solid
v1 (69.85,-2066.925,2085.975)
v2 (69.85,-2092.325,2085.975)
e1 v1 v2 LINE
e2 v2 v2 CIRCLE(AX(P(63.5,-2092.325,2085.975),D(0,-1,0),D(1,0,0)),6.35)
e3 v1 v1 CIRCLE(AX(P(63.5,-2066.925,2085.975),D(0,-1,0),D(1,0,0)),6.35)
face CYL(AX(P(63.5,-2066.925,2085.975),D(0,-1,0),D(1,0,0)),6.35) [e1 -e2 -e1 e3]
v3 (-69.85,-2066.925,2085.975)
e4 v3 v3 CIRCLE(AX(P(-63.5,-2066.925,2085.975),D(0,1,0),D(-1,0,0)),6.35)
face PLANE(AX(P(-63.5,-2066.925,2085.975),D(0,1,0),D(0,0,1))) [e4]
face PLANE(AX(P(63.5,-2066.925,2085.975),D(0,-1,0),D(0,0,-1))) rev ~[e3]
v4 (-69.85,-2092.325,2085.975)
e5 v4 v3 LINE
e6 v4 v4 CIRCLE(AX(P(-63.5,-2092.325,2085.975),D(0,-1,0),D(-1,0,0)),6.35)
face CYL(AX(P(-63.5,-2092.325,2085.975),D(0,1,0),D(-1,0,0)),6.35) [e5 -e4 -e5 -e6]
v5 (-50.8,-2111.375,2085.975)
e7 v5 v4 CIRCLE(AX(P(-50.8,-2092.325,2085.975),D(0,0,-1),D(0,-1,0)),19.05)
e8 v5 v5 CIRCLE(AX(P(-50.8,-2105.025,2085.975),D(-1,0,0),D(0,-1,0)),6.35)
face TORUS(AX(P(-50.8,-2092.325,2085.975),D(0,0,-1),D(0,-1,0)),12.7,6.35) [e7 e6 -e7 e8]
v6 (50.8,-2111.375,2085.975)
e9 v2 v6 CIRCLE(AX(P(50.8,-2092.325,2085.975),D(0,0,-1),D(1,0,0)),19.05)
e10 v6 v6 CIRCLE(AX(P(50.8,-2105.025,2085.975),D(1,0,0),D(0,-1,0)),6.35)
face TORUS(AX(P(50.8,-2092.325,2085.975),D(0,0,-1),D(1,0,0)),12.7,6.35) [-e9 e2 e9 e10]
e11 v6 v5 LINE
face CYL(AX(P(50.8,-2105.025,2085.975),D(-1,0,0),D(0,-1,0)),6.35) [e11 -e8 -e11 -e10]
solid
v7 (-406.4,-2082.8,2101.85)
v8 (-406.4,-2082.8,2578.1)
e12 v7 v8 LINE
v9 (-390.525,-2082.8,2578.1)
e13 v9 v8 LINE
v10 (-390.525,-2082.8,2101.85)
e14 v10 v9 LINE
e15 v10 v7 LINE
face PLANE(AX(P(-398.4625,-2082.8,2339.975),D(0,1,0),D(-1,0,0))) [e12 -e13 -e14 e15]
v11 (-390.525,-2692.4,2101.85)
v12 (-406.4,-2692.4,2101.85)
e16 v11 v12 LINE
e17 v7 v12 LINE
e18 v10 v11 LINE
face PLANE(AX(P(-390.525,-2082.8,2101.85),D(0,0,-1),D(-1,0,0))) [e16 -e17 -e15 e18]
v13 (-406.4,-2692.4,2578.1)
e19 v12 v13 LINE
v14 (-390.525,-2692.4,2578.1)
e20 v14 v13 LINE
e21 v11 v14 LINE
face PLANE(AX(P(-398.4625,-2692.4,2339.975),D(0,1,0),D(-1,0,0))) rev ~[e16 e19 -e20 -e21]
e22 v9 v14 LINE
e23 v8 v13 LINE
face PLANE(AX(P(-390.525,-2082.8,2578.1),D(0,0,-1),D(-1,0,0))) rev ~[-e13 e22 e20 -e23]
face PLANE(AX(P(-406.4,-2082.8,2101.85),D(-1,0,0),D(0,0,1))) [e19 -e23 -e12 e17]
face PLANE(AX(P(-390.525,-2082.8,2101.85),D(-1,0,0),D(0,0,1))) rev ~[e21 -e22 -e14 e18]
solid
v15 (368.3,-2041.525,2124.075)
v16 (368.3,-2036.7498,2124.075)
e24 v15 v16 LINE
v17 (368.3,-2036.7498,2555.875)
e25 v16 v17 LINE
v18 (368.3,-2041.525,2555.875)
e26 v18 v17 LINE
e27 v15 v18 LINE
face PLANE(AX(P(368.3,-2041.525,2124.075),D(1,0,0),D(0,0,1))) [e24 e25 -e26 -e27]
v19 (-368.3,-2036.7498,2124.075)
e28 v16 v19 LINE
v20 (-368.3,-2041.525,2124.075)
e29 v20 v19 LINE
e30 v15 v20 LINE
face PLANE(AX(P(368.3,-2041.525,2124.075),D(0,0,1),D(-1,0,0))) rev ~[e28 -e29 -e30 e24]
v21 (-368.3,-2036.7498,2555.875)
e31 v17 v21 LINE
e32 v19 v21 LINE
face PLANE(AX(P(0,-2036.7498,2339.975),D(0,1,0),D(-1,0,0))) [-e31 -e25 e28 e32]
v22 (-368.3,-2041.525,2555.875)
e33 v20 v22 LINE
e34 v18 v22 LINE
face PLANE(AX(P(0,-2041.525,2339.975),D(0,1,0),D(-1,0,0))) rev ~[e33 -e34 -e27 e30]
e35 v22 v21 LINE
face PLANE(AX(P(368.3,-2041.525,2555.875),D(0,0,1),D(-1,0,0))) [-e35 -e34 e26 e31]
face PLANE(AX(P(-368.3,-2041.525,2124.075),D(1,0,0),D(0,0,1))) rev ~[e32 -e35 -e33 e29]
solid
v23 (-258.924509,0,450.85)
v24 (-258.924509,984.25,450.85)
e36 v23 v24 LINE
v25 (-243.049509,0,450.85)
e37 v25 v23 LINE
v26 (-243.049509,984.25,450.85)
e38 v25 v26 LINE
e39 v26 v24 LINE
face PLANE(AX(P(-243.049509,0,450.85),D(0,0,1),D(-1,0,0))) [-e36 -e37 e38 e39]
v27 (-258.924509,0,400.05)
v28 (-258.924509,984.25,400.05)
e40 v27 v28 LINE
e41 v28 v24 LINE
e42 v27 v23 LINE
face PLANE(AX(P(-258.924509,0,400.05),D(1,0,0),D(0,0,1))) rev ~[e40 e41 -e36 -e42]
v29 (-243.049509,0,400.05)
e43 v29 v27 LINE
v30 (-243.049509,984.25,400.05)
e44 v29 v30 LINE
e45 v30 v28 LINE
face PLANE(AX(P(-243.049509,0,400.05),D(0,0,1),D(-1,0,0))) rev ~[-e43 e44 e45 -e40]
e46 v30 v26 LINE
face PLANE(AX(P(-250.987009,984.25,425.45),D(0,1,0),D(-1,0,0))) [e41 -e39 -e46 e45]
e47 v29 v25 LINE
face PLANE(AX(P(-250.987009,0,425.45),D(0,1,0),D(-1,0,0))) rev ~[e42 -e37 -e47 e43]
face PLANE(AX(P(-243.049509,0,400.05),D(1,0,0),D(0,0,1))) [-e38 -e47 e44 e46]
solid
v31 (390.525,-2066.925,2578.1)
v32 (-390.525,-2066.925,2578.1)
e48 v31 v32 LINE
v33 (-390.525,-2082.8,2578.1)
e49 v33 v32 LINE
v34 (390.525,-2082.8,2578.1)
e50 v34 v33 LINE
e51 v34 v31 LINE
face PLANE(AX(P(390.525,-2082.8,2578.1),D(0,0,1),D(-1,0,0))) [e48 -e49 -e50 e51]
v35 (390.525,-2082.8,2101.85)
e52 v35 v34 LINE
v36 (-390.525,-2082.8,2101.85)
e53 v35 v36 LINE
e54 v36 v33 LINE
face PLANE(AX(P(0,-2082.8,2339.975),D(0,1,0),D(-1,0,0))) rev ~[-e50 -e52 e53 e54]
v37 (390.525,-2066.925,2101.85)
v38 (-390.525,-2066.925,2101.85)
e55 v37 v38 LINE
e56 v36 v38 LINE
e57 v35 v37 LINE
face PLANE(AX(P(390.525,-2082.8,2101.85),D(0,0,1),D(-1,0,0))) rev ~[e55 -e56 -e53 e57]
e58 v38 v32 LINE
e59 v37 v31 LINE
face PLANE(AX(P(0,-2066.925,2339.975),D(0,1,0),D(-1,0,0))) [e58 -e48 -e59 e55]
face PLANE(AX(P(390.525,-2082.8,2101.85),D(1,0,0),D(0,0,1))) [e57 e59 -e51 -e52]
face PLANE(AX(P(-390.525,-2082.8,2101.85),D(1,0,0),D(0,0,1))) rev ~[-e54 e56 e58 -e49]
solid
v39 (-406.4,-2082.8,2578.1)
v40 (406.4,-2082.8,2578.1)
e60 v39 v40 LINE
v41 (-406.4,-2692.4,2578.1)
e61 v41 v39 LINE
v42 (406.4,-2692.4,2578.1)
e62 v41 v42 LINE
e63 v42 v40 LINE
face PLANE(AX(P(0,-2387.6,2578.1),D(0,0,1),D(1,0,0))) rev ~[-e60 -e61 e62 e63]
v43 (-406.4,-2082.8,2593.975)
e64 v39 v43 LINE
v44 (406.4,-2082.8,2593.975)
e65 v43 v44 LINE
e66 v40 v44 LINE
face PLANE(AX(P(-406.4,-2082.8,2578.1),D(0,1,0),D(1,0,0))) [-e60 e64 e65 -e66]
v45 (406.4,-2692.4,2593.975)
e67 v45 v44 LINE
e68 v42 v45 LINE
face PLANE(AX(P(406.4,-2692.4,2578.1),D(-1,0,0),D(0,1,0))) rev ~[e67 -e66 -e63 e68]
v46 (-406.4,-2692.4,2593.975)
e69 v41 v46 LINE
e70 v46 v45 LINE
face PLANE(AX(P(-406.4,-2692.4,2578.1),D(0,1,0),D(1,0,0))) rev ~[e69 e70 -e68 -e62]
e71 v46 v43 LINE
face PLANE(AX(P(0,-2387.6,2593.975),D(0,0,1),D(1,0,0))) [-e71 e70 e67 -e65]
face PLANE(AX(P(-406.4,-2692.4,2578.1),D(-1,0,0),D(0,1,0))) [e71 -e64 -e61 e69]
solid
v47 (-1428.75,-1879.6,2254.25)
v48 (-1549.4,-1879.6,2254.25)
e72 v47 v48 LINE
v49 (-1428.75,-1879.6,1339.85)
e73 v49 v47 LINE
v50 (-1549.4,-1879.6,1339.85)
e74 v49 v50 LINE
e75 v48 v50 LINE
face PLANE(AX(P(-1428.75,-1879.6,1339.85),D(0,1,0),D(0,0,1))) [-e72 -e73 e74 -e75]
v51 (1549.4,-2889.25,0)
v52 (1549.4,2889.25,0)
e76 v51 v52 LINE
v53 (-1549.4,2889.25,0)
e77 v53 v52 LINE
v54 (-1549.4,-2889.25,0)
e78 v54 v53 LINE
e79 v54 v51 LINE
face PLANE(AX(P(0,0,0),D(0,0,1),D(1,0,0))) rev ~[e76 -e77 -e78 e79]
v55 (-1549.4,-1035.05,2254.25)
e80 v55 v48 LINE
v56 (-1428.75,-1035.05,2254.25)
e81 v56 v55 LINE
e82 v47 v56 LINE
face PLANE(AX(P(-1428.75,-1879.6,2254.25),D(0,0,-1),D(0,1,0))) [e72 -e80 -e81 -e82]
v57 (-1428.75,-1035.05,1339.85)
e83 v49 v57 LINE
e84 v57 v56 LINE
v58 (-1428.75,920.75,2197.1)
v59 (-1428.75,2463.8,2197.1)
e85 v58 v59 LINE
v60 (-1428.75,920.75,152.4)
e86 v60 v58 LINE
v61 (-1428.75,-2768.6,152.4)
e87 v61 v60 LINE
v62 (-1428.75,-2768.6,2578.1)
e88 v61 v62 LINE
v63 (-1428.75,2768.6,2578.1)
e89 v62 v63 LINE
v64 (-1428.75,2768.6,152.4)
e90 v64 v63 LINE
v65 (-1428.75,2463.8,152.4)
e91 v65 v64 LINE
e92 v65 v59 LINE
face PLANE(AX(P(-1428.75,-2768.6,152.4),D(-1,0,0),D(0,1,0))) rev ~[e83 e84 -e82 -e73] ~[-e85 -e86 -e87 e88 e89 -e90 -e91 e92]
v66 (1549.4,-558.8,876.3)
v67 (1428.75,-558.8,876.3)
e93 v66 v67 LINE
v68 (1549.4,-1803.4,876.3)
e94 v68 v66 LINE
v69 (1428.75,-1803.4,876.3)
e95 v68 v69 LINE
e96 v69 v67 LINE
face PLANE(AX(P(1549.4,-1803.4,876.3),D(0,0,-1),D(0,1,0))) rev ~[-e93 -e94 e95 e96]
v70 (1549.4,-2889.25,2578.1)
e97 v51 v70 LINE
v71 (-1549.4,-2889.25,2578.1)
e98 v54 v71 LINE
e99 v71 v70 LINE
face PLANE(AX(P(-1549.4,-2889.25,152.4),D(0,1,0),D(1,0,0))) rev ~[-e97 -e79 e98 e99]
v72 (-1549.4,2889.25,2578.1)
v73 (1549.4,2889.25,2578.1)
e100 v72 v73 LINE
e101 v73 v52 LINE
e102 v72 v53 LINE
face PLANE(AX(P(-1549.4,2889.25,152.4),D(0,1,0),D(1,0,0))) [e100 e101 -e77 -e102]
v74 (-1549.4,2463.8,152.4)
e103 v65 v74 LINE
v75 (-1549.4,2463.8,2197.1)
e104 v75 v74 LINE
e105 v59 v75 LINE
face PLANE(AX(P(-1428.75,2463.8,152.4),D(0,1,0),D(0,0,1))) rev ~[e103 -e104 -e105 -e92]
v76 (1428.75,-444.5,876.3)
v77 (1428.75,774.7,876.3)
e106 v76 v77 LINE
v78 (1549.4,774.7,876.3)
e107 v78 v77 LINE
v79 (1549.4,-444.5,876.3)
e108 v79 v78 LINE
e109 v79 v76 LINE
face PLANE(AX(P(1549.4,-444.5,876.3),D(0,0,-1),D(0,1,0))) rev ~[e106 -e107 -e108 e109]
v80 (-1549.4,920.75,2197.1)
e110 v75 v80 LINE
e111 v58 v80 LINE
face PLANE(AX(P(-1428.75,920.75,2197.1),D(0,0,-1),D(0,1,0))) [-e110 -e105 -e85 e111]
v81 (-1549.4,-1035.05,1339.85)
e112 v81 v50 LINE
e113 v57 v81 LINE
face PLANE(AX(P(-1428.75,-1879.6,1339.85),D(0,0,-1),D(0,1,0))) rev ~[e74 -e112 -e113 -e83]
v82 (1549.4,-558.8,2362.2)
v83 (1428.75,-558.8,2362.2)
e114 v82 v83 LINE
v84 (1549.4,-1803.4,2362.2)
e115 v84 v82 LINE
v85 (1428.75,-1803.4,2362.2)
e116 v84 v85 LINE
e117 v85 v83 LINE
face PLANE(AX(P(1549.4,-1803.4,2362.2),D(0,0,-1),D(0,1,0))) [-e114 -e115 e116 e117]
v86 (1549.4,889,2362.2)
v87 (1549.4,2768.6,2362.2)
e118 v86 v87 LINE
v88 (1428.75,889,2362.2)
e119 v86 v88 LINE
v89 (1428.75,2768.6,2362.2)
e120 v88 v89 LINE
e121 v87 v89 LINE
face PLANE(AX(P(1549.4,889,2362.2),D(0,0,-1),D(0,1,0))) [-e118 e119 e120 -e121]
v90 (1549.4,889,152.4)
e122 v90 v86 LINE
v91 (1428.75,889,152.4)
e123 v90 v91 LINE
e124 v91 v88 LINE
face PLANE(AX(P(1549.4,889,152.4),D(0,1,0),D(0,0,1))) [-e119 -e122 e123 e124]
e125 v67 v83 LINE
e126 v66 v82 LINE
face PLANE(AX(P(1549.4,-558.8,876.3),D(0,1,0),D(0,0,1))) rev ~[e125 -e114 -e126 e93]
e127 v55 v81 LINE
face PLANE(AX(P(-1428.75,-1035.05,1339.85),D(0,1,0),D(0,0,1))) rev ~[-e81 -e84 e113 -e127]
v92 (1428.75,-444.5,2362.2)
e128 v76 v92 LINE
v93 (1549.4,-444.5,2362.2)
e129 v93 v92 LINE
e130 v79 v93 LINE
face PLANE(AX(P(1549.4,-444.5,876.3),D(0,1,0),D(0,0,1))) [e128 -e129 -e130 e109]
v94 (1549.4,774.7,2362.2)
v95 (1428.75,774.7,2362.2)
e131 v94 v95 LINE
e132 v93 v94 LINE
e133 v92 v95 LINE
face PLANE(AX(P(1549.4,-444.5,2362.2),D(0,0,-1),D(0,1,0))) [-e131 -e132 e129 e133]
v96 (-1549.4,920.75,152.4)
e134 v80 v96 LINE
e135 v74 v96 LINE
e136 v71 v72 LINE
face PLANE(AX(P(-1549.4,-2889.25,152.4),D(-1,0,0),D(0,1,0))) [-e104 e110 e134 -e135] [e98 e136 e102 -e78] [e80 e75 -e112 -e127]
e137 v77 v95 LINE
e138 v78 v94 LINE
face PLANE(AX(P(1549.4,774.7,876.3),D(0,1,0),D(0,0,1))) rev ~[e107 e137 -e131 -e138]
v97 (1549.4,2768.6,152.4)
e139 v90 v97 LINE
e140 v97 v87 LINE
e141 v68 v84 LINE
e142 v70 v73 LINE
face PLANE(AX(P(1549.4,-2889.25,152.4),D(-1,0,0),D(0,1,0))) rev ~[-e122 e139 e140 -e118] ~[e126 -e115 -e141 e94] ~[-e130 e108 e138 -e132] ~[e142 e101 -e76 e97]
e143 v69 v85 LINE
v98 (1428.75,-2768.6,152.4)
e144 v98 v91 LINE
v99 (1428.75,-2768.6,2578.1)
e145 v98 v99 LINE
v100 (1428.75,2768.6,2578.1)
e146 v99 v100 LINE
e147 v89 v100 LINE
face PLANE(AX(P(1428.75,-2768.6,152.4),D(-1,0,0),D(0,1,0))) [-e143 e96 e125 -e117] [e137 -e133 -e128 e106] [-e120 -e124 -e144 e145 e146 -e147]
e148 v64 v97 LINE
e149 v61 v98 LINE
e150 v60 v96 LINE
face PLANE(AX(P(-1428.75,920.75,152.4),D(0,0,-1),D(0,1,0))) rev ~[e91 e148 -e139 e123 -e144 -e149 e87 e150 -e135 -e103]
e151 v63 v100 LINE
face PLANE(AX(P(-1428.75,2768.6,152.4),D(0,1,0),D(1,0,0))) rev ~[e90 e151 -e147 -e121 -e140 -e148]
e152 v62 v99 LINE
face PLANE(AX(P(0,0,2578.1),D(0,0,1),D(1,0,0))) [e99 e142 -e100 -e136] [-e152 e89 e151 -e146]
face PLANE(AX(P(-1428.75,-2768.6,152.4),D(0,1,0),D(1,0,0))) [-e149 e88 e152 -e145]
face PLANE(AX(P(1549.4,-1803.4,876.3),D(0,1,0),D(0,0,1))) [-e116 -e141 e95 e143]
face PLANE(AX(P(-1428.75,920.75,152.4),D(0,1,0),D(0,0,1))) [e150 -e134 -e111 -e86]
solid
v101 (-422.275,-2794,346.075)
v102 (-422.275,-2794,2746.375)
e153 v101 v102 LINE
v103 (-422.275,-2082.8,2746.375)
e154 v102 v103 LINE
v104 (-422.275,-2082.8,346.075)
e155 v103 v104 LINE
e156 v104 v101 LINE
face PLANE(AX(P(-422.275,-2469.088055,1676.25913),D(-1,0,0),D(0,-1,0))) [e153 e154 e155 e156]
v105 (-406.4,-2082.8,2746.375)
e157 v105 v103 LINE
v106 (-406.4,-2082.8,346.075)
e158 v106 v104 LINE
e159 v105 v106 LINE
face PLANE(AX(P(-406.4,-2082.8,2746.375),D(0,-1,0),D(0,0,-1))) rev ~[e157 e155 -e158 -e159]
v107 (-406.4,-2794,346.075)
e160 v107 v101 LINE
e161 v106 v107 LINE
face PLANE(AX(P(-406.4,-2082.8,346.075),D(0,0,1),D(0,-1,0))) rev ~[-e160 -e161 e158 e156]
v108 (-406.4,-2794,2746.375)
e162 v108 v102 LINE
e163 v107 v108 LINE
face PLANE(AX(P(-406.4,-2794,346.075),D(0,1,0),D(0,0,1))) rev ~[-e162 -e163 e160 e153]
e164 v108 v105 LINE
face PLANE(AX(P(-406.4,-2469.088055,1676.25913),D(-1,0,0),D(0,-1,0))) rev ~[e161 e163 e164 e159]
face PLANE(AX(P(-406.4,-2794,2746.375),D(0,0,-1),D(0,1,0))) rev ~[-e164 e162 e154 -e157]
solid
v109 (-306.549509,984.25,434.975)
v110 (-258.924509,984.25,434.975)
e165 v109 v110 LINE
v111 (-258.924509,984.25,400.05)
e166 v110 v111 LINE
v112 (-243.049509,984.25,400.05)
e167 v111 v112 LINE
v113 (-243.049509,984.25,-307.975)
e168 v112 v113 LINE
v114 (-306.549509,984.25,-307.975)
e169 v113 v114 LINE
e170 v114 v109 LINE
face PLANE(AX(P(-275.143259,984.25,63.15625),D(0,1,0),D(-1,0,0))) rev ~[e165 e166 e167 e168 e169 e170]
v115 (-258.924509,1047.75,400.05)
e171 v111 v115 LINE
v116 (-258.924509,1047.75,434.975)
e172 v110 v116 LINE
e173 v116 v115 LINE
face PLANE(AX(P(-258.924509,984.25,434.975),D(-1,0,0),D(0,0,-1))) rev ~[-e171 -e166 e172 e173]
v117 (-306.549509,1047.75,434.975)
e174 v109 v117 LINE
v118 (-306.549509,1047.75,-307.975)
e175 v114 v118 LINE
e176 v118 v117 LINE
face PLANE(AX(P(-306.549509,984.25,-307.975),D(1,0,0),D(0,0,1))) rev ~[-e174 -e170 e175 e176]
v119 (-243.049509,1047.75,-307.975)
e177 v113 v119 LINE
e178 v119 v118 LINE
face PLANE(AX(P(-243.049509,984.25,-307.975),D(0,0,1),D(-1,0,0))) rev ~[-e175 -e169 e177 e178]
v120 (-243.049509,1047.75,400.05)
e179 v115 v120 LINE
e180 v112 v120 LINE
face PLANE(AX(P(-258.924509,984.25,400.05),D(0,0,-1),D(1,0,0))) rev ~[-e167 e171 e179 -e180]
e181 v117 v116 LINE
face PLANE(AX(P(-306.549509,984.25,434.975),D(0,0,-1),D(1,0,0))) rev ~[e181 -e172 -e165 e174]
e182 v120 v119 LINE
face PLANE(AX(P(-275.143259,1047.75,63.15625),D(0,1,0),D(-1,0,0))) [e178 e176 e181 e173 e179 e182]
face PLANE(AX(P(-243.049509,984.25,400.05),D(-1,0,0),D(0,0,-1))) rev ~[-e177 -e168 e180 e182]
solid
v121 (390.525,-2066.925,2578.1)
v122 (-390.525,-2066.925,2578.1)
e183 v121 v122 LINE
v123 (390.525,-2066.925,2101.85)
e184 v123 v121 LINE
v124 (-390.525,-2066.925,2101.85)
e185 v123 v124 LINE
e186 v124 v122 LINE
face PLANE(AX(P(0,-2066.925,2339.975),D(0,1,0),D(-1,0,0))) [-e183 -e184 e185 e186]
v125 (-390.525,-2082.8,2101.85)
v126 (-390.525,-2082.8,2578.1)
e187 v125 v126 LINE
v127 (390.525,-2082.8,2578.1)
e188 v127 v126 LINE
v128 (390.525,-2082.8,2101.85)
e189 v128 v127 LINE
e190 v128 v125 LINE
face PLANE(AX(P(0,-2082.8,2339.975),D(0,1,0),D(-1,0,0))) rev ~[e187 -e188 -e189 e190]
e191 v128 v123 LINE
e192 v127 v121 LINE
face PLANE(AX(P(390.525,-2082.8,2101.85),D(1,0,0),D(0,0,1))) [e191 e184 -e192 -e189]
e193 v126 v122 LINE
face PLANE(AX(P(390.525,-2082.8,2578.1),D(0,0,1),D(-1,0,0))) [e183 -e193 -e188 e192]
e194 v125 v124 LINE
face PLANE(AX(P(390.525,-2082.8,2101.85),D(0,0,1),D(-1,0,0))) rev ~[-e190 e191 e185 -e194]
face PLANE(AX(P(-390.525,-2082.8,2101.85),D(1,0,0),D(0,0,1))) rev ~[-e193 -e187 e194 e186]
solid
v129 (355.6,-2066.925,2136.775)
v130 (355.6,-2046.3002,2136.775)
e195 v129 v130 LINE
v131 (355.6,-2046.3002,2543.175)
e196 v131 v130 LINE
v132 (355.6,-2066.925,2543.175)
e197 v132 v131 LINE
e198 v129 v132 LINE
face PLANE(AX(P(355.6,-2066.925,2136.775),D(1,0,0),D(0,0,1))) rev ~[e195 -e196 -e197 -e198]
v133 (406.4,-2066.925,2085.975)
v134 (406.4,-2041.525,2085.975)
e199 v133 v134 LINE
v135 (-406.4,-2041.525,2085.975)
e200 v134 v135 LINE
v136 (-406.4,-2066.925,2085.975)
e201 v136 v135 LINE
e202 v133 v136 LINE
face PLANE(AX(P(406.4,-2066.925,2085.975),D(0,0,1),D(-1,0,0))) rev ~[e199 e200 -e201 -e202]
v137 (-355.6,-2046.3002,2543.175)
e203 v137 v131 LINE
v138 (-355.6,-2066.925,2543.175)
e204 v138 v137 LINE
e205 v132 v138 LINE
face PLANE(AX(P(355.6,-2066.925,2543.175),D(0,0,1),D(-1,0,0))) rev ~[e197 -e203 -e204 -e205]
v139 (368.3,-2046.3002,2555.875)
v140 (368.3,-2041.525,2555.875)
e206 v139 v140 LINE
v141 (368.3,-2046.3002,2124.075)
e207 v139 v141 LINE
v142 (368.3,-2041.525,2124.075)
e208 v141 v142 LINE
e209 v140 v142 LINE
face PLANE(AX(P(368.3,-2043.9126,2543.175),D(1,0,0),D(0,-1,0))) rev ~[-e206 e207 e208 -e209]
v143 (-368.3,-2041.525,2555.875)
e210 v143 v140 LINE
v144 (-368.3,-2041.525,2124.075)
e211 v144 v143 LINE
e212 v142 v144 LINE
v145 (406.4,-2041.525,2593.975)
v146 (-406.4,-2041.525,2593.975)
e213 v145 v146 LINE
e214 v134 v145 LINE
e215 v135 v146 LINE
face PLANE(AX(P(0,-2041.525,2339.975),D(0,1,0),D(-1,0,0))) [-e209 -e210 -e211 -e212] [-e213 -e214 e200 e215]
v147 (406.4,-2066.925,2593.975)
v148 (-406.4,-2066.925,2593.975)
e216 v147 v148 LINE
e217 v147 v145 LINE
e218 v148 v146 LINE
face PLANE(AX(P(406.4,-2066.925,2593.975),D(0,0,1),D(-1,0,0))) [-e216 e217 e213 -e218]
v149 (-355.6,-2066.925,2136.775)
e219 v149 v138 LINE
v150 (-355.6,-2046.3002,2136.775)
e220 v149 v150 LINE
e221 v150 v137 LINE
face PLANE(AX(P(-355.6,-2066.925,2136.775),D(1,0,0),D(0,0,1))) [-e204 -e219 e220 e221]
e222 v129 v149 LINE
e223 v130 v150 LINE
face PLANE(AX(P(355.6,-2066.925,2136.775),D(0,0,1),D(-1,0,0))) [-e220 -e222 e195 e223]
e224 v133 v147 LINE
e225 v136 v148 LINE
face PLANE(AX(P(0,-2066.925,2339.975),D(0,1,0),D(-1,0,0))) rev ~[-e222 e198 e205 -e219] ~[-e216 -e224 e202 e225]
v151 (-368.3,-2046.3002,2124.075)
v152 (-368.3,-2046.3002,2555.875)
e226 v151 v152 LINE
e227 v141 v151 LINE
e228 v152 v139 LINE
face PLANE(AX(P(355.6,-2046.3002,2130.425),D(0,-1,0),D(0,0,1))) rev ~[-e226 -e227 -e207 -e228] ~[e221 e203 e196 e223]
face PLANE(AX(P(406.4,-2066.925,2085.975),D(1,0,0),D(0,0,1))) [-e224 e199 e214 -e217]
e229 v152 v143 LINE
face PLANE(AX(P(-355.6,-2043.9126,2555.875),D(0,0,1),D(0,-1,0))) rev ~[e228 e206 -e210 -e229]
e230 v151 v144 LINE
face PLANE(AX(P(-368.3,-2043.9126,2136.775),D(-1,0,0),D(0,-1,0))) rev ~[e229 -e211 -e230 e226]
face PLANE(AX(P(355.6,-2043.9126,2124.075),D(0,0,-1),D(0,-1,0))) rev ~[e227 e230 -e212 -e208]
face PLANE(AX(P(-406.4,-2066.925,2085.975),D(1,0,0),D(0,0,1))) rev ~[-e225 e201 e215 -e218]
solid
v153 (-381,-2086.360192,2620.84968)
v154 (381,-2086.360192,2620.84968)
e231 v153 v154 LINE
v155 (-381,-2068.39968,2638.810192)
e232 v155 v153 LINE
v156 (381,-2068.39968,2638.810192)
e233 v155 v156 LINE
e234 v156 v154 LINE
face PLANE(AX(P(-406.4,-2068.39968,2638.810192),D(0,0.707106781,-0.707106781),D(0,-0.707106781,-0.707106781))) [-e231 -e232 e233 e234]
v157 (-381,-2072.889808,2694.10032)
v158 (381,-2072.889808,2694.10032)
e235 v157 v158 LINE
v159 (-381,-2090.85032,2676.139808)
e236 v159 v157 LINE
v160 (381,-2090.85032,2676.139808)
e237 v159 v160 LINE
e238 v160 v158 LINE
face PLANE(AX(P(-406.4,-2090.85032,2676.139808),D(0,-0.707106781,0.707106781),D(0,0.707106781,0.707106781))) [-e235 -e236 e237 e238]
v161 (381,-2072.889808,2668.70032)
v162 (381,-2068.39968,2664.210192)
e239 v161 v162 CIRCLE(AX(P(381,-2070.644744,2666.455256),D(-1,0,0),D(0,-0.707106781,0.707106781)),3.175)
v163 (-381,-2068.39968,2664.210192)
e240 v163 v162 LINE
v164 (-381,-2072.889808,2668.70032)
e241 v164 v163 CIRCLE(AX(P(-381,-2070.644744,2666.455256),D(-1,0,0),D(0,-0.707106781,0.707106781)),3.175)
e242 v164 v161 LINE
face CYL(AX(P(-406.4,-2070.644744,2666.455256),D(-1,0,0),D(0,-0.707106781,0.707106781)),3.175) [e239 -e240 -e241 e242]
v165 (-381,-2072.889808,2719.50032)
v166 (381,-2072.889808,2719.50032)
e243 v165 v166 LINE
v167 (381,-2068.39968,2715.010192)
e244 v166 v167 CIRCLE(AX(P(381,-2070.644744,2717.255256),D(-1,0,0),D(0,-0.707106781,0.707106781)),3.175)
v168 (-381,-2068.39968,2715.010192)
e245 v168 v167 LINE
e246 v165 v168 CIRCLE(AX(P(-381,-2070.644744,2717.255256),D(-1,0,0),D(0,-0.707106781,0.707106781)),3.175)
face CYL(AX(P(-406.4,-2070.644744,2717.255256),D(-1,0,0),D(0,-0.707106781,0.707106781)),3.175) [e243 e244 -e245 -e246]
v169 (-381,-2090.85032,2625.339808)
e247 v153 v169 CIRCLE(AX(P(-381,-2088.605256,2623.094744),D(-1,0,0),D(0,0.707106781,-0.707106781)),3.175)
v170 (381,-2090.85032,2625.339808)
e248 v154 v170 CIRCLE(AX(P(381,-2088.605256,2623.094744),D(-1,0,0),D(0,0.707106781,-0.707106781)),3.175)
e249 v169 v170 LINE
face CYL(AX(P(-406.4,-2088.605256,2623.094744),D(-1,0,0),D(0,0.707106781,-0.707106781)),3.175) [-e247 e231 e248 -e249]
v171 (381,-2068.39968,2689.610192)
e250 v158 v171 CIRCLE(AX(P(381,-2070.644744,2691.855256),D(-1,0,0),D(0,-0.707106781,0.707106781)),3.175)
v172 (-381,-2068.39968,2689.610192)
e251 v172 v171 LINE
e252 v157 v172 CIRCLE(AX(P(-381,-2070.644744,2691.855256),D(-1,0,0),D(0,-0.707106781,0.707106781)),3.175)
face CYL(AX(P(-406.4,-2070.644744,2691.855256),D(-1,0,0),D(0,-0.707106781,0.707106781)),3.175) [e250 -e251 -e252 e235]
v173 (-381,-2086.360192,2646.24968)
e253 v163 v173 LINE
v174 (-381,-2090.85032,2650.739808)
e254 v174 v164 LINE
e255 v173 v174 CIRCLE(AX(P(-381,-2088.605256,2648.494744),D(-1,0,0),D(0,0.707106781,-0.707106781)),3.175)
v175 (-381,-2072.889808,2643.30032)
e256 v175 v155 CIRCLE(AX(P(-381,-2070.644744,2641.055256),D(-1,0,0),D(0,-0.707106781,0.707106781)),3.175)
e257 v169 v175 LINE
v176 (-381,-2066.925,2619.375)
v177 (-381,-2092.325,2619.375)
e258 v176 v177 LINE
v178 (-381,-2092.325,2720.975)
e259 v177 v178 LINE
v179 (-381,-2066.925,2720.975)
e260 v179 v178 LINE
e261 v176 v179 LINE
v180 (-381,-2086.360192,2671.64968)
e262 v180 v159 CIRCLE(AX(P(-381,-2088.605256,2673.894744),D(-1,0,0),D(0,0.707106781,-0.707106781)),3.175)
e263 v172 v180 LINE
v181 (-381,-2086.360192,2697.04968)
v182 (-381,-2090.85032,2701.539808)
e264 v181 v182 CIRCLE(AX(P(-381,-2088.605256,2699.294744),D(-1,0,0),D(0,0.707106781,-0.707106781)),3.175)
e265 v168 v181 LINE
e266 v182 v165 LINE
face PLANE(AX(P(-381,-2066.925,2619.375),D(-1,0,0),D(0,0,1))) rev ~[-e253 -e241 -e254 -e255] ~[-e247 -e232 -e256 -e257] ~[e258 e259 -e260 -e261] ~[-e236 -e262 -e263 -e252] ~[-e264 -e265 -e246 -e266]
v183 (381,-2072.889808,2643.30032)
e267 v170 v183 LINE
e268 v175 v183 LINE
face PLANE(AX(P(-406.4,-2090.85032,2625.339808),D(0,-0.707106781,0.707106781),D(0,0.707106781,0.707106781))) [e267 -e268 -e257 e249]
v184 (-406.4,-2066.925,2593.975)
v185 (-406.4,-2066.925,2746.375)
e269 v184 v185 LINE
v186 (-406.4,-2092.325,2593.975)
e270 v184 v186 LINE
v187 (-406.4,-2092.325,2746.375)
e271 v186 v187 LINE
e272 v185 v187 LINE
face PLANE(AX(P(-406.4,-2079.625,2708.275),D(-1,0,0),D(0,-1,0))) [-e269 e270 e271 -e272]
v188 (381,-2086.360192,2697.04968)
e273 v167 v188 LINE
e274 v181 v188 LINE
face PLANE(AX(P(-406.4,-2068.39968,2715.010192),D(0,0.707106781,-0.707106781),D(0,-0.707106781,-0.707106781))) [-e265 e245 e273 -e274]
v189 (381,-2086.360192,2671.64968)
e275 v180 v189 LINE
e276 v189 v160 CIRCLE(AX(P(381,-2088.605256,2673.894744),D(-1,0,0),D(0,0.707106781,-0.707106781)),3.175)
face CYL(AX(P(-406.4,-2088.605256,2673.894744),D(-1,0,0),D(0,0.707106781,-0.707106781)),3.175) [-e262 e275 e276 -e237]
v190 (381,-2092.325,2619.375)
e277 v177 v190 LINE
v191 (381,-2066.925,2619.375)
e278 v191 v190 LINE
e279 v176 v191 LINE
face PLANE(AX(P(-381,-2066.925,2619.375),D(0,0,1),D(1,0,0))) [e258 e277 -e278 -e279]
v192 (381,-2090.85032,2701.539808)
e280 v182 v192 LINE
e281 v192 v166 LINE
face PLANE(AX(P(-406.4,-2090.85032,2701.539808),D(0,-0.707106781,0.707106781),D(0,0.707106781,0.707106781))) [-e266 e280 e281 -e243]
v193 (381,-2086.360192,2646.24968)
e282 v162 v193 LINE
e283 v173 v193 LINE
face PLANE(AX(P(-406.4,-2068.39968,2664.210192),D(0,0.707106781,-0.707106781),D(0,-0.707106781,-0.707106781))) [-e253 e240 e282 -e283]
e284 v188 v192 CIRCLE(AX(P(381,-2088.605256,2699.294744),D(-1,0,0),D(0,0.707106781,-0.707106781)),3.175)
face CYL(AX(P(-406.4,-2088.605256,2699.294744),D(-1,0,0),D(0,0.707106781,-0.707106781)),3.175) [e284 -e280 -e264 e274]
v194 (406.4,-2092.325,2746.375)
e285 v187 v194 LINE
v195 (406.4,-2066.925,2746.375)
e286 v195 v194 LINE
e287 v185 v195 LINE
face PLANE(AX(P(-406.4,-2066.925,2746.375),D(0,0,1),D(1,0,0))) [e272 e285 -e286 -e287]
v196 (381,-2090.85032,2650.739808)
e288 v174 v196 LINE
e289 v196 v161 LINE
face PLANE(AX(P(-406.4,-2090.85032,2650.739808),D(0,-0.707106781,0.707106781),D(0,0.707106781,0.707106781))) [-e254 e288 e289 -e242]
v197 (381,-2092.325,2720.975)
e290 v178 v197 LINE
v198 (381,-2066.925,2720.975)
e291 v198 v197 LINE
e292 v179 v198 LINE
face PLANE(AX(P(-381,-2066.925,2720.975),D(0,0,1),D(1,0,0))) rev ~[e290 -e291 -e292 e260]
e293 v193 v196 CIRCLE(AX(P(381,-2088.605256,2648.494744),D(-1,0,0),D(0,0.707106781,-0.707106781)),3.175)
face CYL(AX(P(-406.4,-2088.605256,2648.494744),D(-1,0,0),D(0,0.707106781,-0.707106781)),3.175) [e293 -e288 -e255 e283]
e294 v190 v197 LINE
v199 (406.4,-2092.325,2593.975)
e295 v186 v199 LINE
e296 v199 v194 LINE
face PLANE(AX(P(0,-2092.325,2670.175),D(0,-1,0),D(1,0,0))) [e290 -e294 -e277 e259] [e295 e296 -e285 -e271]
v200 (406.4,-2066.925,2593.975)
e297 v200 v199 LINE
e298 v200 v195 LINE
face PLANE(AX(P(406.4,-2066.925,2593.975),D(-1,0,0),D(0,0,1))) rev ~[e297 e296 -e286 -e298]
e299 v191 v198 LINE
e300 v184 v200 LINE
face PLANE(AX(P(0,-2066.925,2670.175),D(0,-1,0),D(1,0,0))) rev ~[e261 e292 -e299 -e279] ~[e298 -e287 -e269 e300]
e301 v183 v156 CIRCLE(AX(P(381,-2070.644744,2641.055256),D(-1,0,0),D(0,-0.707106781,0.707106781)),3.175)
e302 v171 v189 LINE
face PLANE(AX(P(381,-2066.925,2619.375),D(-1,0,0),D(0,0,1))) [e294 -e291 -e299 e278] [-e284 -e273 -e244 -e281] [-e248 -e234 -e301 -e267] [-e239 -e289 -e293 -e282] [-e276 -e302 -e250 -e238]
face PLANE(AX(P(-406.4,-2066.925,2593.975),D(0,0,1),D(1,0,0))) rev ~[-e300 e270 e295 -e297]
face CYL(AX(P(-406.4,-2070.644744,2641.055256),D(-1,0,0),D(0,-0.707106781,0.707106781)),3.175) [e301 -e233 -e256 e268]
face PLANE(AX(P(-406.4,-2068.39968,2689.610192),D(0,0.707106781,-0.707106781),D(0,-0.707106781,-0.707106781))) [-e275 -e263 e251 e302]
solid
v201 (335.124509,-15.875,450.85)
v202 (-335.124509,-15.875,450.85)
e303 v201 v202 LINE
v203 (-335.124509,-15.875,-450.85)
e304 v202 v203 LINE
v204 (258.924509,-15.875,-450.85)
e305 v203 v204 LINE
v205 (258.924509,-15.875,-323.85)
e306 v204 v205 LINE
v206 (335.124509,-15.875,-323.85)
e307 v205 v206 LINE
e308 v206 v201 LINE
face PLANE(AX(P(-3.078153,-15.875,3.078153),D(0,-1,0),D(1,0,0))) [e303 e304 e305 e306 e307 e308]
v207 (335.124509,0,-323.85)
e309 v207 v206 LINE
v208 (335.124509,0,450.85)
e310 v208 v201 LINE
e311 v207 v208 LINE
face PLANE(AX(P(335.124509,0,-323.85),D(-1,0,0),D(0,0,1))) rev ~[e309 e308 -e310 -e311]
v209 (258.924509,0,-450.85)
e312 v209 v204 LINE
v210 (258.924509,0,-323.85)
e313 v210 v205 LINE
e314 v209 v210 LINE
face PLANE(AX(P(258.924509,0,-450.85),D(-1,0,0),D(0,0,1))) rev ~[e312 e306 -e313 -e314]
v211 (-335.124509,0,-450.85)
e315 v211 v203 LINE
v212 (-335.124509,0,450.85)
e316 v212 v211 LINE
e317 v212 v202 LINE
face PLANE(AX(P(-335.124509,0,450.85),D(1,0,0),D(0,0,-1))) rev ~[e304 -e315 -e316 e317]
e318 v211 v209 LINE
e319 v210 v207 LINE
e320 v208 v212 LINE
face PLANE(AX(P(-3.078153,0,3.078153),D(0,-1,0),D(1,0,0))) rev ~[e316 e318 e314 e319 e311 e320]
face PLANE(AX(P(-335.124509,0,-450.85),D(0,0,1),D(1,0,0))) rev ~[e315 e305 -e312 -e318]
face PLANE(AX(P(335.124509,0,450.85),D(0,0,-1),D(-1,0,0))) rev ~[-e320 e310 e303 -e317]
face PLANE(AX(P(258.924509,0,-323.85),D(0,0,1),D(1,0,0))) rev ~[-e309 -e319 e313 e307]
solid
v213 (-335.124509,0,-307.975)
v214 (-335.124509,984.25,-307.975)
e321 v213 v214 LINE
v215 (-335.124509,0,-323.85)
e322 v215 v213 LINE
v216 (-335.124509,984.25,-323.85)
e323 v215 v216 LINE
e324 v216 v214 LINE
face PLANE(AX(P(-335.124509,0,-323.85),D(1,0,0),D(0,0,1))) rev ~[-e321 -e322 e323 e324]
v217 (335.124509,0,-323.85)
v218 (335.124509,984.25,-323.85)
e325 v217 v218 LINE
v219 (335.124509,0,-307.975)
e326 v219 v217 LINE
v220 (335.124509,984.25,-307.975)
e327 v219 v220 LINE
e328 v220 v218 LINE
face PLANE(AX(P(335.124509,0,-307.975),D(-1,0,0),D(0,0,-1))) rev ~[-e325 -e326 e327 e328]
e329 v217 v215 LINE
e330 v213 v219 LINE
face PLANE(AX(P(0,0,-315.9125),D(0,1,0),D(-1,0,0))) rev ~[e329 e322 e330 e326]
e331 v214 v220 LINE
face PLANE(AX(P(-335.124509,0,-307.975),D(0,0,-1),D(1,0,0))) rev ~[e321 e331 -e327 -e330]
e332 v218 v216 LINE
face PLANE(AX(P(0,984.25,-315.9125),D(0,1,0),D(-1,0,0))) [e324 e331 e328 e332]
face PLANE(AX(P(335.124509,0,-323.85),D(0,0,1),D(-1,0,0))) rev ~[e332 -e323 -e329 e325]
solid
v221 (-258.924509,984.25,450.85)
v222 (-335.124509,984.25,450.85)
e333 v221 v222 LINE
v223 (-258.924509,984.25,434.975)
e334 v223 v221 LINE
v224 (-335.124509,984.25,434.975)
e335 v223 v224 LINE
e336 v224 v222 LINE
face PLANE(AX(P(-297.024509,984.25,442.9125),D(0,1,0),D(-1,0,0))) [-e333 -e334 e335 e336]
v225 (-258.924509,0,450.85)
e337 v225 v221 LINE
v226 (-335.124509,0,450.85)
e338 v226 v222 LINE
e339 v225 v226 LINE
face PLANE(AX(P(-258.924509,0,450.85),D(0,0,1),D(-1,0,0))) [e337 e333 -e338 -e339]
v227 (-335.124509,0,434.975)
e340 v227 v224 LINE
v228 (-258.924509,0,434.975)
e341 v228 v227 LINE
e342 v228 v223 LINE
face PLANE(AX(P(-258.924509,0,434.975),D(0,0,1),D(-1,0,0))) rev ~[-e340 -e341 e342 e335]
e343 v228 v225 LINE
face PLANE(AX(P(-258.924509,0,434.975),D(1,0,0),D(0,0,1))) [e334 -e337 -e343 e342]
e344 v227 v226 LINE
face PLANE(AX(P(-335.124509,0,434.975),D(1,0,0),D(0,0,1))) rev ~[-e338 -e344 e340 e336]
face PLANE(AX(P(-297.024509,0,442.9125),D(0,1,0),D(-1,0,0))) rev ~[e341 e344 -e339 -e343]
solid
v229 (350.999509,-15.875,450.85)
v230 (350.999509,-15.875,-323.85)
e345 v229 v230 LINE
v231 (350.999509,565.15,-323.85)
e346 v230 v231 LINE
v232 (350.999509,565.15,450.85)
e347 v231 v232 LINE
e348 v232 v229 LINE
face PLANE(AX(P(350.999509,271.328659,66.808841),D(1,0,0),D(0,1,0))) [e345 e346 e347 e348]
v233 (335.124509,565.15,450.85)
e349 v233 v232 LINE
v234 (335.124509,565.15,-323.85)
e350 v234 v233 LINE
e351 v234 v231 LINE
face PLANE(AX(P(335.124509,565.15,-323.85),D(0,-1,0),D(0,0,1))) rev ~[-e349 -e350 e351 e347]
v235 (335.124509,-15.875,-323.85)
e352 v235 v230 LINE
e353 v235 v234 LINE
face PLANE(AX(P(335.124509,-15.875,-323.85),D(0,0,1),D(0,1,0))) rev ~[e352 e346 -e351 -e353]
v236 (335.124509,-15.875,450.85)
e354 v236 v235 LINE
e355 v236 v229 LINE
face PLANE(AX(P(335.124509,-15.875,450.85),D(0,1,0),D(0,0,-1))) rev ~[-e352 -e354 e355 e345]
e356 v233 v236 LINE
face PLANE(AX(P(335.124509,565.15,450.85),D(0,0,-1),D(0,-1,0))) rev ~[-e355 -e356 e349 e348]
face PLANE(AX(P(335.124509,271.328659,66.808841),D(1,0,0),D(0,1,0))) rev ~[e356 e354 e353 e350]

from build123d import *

# Parameters (mm, degrees)
F0_W      = 3098.8
F0_H      = 5778.5
F1_DEPTH  = 152.4
F2_W      = 3098.8
F2_H      = 5778.5
F2_W_2    = 2857.5
F2_H_2    = 5537.2
F3_DEPTH  = 2425.7
F4_W      = 1879.6
F4_H      = 2209.8
F5_DEPTH  = 120.65
F6_W      = 1219.2
F6_H      = 1485.9
F6_W_2    = 1244.6
F7_DEPTH  = 120.65
F8_W      = 844.55
F8_H      = 914.4
F9_DEPTH  = 120.651
F10_W     = 1543.05
F10_H     = 2044.7
F11_DEPTH = 120.651
F13_W     = 812.8
F13_H     = 609.6
F14_DEPTH = 15.875
F15_W     = 781.05
F15_H     = 476.25
F16_DEPTH = 15.875
F15_W_2   = 15.875
F17_DEPTH = 609.6
F18_DEPTH = 15.875
F19_W     = 812.8
F19_H     = 508
F19_W_2   = 781.05
F19_H_2   = 476.25
F19_W_3   = 711.2
F19_H_3   = 406.4
F20_DEPTH = 25.4
F21_W     = 4.7752
F21_H     = 12.7
F24_W     = 736.6
F24_H     = 431.8
F25_DEPTH = 4.7752
F29_W     = 812.8
F29_H     = 152.4
F29_W_2   = 762
F29_H_2   = 101.6
F30_DEPTH = 25.4
F32_DEPTH = 787.4
F34_DEPTH = 15.875
F35_W     = 76.2
F35_H     = 15.875
F36_DEPTH = 984.25
F38_DEPTH = 984.25
F39_W     = 15.875
F39_H     = 50.8
F40_DEPTH = 984.25
F42_DEPTH = 63.5
F43_W     = 565.15
F43_H     = 15.875
F44_DEPTH = 15.875
F45_W     = 609.6
F45_H     = 476.25
F46_DEPTH = 15.875


with BuildPart() as f1:
    # F0 (on Top) → F1 (new body)
    with BuildSketch(Plane.XY):
        Rectangle(F0_W, F0_H)
    extrude(amount=F1_DEPTH)

    # F2 (on face) → F3 (join)
    with BuildSketch(Plane.XY.offset(152.4)):
        Rectangle(F2_W, F2_H)
        Rectangle(F2_W_2, F2_H_2, mode=Mode.SUBTRACT)
    extrude(amount=F3_DEPTH)

    # F4 (on face) → F5 (cut, through all)
    with BuildSketch(Plane.YZ.offset(1549.4)):
        with Locations((1828.8, 1257.3)):
            Rectangle(F4_W, F4_H)
    extrude(amount=-F5_DEPTH, mode=Mode.SUBTRACT)

    # F6 (on face) → F7 (cut, through all)
    with BuildSketch(Plane.YZ.offset(1549.4)):
        with Locations((165.1, 1619.25)):
            Rectangle(F6_W, F6_H)
        with Locations((-1181.1, 1619.25)):
            Rectangle(F6_W_2, F6_H)
    extrude(amount=-F7_DEPTH, mode=Mode.SUBTRACT)

    # F8 (on face) → F9 (cut, through all)
    with BuildSketch(Plane.YZ.offset(-1428.75)):
        with Locations((-1457.325, 1797.05)):
            Rectangle(F8_W, F8_H)
    extrude(amount=-F9_DEPTH, mode=Mode.SUBTRACT)

    # F10 (on face) → F11 (cut, through all)
    with BuildSketch(Plane.YZ.offset(-1428.75)):
        with Locations((1692.275, 1174.75)):
            Rectangle(F10_W, F10_H)
    extrude(amount=-F11_DEPTH, mode=Mode.SUBTRACT)


with BuildPart() as f14:
    # F13 (on face) → F14 (new body)
    with BuildSketch(Plane.XY.offset(2578.1)):
        with Locations((0, -2387.6)):
            Rectangle(F13_W, F13_H)
    extrude(amount=F14_DEPTH)


with BuildPart() as f16:
    # F15 (on face) → F16 (new body)
    with BuildSketch(Plane(origin=(0, -2082.8, 0), x_dir=(-1, 0, 0), z_dir=(0, 1, 0))):
        with Locations((0, 2339.975)):
            Rectangle(F15_W, F15_H)
    extrude(amount=F16_DEPTH)


with BuildPart() as f17:
    # F15 (on face) → F17 (new body, through all)
    with BuildSketch(Plane(origin=(0, -2082.8, 0), x_dir=(-1, 0, 0), z_dir=(0, 1, 0))):
        with Locations((398.4625, 2339.975)):
            Rectangle(F15_W_2, F15_H)
    extrude(amount=-F17_DEPTH)


with BuildPart() as f18:
    # F15 (on face) → F18 (new body)
    with BuildSketch(Plane(origin=(0, -2082.8, 0), x_dir=(-1, 0, 0), z_dir=(0, 1, 0))):
        with Locations((0, 2339.975)):
            Rectangle(F15_W, F15_H)
    extrude(amount=F18_DEPTH)


with BuildPart() as f20:
    # F19 (on face) → F20 (new body)
    with BuildSketch(Plane(origin=(0, -2066.925, 0), x_dir=(-1, 0, 0), z_dir=(0, 1, 0))):
        with Locations((0, 2339.975)):
            Rectangle(F19_W, F19_H)
        with Locations((0, 2339.975)):
            Rectangle(F19_W_2, F19_H_2, mode=Mode.SUBTRACT)
        with Locations((0, 2339.975)):
            Rectangle(F19_W_2, F19_H_2)
        with Locations((0, 2339.975)):
            Rectangle(F19_W_3, F19_H_3, mode=Mode.SUBTRACT)
    extrude(amount=F20_DEPTH)

    # F23: sweep along a path in F22
    with BuildLine(Plane(origin=(0, -2041.525, 0), x_dir=(-1, 0, 0), z_dir=(0, 1, 0))) as f23_path:
        Line((355.6, 2543.175), (-355.6, 2543.175))
        Line((-355.6, 2543.175), (-355.6, 2136.775))
        Line((-355.6, 2136.775), (355.6, 2136.775))
        Line((355.6, 2136.775), (355.6, 2543.175))
    # F21 (on face) → F23 (sweep, cut)
    with BuildSketch(Plane(origin=(355.6, 0, 0), x_dir=(0, -1, 0), z_dir=(-1, 0, 0))):
        with Locations((2043.9126, 2130.425)):
            Rectangle(F21_W, F21_H)
    sweep(path=f23_path.line, transition=Transition.RIGHT, mode=Mode.SUBTRACT)


with BuildPart() as f25:
    # F24 (on face) → F25 (new body)
    with BuildSketch(Plane(origin=(0, -2041.525, 0), x_dir=(-1, 0, 0), z_dir=(0, 1, 0))):
        with Locations((0, 2339.975)):
            Rectangle(F24_W, F24_H)
    extrude(amount=F25_DEPTH)


with BuildPart() as f28:
    # F28: sweep along a path in F26
    with BuildLine(Plane(origin=(0, 0, 2085.975), x_dir=(1, 0, 0), z_dir=(0, 0, -1))) as f28_path:
        Line((63.5, 2066.925), (63.5, 2092.325))
        ThreePointArc((63.5, 2092.325), (59.7802561211, 2101.3052561211), (50.8, 2105.025))
        Line((50.8, 2105.025), (-50.8, 2105.025))
        ThreePointArc((-50.8, 2105.025), (-59.7802561211, 2101.3052561211), (-63.5, 2092.325))
        Line((-63.5, 2092.325), (-63.5, 2066.925))
    # F27 (on face) → F28 (sweep)
    with BuildSketch(Plane.XZ.offset(2066.925)):
        with BuildLine():
            ThreePointArc((57.15, 2085.975), (63.5, 2079.625), (69.85, 2085.975))
            Line((69.85, 2085.975), (57.15, 2085.975))
        make_face()
        with BuildLine():
            Line((57.15, 2085.975), (69.85, 2085.975))
            ThreePointArc((69.85, 2085.975), (63.5, 2092.325), (57.15, 2085.975))
        make_face()
    sweep(path=f28_path.line)


with BuildPart() as f30:
    # F29 (on face) → F30 (new body)
    with BuildSketch(Plane.XZ.offset(2066.925)):
        with Locations((0, 2670.175)):
            Rectangle(F29_W, F29_H)
        with Locations((0, 2670.175)):
            Rectangle(F29_W_2, F29_H_2, mode=Mode.SUBTRACT)
    extrude(amount=F30_DEPTH)

    # F31 (on face) → F32 (join, through all)
    with BuildSketch(Plane(origin=(-406.4, 0, 0), x_dir=(0, -1, 0), z_dir=(-1, 0, 0))):
        with BuildLine():
            Line((2068.3996798487, 2715.0101920908), (2086.3601920908, 2697.0496798487))
            ThreePointArc((2086.3601920908, 2697.0496798487), (2090.8503201513, 2697.0496798487), (2090.8503201513, 2701.5398079092))
            Line((2090.8503201513, 2701.5398079092), (2072.8898079092, 2719.5003201513))
            ThreePointArc((2072.8898079092, 2719.5003201513), (2068.3996798487, 2719.5003201513), (2068.3996798487, 2715.0101920908))
        make_face()
        with BuildLine():
            Line((2068.3996798487, 2689.6101920908), (2086.3601920908, 2671.6496798487))
            ThreePointArc((2086.3601920908, 2671.6496798487), (2090.8503201513, 2671.6496798487), (2090.8503201513, 2676.1398079092))
            Line((2090.8503201513, 2676.1398079092), (2072.8898079092, 2694.1003201513))
            ThreePointArc((2072.8898079092, 2694.1003201513), (2068.3996798487, 2694.1003201513), (2068.3996798487, 2689.6101920908))
        make_face()
        with BuildLine():
            Line((2068.3996798487, 2664.2101920908), (2086.3601920908, 2646.2496798487))
            ThreePointArc((2086.3601920908, 2646.2496798487), (2090.8503201513, 2646.2496798487), (2090.8503201513, 2650.7398079092))
            Line((2090.8503201513, 2650.7398079092), (2072.8898079092, 2668.7003201513))
            ThreePointArc((2072.8898079092, 2668.7003201513), (2068.3996798487, 2668.7003201513), (2068.3996798487, 2664.2101920908))
        make_face()
        with BuildLine():
            Line((2090.8503201513, 2625.3398079092), (2072.8898079092, 2643.3003201513))
            ThreePointArc((2072.8898079092, 2643.3003201513), (2068.3996798487, 2643.3003201513), (2068.3996798487, 2638.8101920908))
            Line((2068.3996798487, 2638.8101920908), (2086.3601920908, 2620.8496798487))
            ThreePointArc((2086.3601920908, 2620.8496798487), (2090.8503201513, 2620.8496798487), (2090.8503201513, 2625.3398079092))
        make_face()
    extrude(amount=-F32_DEPTH)


with BuildPart() as f34:
    # F33 (on Front) → F34 (new body)
    with BuildSketch(Plane.XZ):
        Polygon((335.1245088988, 450.85), (-335.1245088988, 450.85), (-335.1245088988, -450.85), (258.9245088988, -450.85), (258.9245088988, -323.85), (335.1245088988, -323.85), align=None)
    extrude(amount=F34_DEPTH)


with BuildPart() as f36:
    # F35 (on face) → F36 (new body)
    with BuildSketch(Plane(origin=(0, 0, 0), x_dir=(-1, 0, 0), z_dir=(0, 1, 0))):
        with Locations((297.0245088988, 442.9125)):
            Rectangle(F35_W, F35_H)
    extrude(amount=F36_DEPTH)


with BuildPart() as f38:
    # F37 (on face) → F38 (new body)
    with BuildSketch(Plane(origin=(0, 0, 0), x_dir=(-1, 0, 0), z_dir=(0, 1, 0))):
        Polygon((335.1245088988, -307.975), (-335.1245088988, -307.975), (-335.1245088988, -323.85), (-258.9245088988, -323.85), (335.1245088988, -323.85), align=None)
    extrude(amount=F38_DEPTH)


with BuildPart() as f40:
    # F39 (on face) → F40 (new body)
    with BuildSketch(Plane(origin=(0, 0, 0), x_dir=(-1, 0, 0), z_dir=(0, 1, 0))):
        with Locations((250.9870088988, 425.45)):
            Rectangle(F39_W, F39_H)
    extrude(amount=F40_DEPTH)


with BuildPart() as f42:
    # F41 (on face) → F42 (new body)
    with BuildSketch(Plane(origin=(0, 984.25, 0), x_dir=(-1, 0, 0), z_dir=(0, 1, 0))):
        Polygon((243.0495088988, 400.05), (243.0495088988, -307.975), (306.5495088988, -307.975), (306.5495088988, 434.975), (258.9245088988, 434.975), (258.9245088988, 400.05), align=None)
    extrude(amount=F42_DEPTH)


with BuildPart() as f44:
    # F43 (on face) → F44 (new body)
    with BuildSketch(Plane.YZ.offset(335.1245088988)):
        Polygon((565.15, 450.85), (-15.875, 450.85), (-15.875, -323.85), (0, -323.85), (0, -307.975), (565.15, -307.975), align=None)
        with Locations((282.575, -315.9125)):
            Rectangle(F43_W, F43_H)
    extrude(amount=F44_DEPTH)


with BuildPart() as f46:
    # F45 (on face) → F46 (new body)
    with BuildSketch(Plane(origin=(-406.4, 0, 0), x_dir=(0, -1, 0), z_dir=(-1, 0, 0))):
        Polygon((2794, 2746.375), (2082.8, 2746.375), (2082.8, 2578.1), (2692.4, 2578.1), (2692.4, 2101.85), (2082.8, 2101.85), (2082.8, 346.075), (2794, 346.075), align=None)
        with Locations((2387.6, 2339.975)):
            Rectangle(F45_W, F45_H)
    extrude(amount=F46_DEPTH)


solid = Compound([f1.part, f14.part, f16.part, f17.part, f18.part, f20.part, f25.part, f28.part, f30.part, f34.part, f36.part, f38.part, f40.part, f42.part, f44.part, f46.part])
